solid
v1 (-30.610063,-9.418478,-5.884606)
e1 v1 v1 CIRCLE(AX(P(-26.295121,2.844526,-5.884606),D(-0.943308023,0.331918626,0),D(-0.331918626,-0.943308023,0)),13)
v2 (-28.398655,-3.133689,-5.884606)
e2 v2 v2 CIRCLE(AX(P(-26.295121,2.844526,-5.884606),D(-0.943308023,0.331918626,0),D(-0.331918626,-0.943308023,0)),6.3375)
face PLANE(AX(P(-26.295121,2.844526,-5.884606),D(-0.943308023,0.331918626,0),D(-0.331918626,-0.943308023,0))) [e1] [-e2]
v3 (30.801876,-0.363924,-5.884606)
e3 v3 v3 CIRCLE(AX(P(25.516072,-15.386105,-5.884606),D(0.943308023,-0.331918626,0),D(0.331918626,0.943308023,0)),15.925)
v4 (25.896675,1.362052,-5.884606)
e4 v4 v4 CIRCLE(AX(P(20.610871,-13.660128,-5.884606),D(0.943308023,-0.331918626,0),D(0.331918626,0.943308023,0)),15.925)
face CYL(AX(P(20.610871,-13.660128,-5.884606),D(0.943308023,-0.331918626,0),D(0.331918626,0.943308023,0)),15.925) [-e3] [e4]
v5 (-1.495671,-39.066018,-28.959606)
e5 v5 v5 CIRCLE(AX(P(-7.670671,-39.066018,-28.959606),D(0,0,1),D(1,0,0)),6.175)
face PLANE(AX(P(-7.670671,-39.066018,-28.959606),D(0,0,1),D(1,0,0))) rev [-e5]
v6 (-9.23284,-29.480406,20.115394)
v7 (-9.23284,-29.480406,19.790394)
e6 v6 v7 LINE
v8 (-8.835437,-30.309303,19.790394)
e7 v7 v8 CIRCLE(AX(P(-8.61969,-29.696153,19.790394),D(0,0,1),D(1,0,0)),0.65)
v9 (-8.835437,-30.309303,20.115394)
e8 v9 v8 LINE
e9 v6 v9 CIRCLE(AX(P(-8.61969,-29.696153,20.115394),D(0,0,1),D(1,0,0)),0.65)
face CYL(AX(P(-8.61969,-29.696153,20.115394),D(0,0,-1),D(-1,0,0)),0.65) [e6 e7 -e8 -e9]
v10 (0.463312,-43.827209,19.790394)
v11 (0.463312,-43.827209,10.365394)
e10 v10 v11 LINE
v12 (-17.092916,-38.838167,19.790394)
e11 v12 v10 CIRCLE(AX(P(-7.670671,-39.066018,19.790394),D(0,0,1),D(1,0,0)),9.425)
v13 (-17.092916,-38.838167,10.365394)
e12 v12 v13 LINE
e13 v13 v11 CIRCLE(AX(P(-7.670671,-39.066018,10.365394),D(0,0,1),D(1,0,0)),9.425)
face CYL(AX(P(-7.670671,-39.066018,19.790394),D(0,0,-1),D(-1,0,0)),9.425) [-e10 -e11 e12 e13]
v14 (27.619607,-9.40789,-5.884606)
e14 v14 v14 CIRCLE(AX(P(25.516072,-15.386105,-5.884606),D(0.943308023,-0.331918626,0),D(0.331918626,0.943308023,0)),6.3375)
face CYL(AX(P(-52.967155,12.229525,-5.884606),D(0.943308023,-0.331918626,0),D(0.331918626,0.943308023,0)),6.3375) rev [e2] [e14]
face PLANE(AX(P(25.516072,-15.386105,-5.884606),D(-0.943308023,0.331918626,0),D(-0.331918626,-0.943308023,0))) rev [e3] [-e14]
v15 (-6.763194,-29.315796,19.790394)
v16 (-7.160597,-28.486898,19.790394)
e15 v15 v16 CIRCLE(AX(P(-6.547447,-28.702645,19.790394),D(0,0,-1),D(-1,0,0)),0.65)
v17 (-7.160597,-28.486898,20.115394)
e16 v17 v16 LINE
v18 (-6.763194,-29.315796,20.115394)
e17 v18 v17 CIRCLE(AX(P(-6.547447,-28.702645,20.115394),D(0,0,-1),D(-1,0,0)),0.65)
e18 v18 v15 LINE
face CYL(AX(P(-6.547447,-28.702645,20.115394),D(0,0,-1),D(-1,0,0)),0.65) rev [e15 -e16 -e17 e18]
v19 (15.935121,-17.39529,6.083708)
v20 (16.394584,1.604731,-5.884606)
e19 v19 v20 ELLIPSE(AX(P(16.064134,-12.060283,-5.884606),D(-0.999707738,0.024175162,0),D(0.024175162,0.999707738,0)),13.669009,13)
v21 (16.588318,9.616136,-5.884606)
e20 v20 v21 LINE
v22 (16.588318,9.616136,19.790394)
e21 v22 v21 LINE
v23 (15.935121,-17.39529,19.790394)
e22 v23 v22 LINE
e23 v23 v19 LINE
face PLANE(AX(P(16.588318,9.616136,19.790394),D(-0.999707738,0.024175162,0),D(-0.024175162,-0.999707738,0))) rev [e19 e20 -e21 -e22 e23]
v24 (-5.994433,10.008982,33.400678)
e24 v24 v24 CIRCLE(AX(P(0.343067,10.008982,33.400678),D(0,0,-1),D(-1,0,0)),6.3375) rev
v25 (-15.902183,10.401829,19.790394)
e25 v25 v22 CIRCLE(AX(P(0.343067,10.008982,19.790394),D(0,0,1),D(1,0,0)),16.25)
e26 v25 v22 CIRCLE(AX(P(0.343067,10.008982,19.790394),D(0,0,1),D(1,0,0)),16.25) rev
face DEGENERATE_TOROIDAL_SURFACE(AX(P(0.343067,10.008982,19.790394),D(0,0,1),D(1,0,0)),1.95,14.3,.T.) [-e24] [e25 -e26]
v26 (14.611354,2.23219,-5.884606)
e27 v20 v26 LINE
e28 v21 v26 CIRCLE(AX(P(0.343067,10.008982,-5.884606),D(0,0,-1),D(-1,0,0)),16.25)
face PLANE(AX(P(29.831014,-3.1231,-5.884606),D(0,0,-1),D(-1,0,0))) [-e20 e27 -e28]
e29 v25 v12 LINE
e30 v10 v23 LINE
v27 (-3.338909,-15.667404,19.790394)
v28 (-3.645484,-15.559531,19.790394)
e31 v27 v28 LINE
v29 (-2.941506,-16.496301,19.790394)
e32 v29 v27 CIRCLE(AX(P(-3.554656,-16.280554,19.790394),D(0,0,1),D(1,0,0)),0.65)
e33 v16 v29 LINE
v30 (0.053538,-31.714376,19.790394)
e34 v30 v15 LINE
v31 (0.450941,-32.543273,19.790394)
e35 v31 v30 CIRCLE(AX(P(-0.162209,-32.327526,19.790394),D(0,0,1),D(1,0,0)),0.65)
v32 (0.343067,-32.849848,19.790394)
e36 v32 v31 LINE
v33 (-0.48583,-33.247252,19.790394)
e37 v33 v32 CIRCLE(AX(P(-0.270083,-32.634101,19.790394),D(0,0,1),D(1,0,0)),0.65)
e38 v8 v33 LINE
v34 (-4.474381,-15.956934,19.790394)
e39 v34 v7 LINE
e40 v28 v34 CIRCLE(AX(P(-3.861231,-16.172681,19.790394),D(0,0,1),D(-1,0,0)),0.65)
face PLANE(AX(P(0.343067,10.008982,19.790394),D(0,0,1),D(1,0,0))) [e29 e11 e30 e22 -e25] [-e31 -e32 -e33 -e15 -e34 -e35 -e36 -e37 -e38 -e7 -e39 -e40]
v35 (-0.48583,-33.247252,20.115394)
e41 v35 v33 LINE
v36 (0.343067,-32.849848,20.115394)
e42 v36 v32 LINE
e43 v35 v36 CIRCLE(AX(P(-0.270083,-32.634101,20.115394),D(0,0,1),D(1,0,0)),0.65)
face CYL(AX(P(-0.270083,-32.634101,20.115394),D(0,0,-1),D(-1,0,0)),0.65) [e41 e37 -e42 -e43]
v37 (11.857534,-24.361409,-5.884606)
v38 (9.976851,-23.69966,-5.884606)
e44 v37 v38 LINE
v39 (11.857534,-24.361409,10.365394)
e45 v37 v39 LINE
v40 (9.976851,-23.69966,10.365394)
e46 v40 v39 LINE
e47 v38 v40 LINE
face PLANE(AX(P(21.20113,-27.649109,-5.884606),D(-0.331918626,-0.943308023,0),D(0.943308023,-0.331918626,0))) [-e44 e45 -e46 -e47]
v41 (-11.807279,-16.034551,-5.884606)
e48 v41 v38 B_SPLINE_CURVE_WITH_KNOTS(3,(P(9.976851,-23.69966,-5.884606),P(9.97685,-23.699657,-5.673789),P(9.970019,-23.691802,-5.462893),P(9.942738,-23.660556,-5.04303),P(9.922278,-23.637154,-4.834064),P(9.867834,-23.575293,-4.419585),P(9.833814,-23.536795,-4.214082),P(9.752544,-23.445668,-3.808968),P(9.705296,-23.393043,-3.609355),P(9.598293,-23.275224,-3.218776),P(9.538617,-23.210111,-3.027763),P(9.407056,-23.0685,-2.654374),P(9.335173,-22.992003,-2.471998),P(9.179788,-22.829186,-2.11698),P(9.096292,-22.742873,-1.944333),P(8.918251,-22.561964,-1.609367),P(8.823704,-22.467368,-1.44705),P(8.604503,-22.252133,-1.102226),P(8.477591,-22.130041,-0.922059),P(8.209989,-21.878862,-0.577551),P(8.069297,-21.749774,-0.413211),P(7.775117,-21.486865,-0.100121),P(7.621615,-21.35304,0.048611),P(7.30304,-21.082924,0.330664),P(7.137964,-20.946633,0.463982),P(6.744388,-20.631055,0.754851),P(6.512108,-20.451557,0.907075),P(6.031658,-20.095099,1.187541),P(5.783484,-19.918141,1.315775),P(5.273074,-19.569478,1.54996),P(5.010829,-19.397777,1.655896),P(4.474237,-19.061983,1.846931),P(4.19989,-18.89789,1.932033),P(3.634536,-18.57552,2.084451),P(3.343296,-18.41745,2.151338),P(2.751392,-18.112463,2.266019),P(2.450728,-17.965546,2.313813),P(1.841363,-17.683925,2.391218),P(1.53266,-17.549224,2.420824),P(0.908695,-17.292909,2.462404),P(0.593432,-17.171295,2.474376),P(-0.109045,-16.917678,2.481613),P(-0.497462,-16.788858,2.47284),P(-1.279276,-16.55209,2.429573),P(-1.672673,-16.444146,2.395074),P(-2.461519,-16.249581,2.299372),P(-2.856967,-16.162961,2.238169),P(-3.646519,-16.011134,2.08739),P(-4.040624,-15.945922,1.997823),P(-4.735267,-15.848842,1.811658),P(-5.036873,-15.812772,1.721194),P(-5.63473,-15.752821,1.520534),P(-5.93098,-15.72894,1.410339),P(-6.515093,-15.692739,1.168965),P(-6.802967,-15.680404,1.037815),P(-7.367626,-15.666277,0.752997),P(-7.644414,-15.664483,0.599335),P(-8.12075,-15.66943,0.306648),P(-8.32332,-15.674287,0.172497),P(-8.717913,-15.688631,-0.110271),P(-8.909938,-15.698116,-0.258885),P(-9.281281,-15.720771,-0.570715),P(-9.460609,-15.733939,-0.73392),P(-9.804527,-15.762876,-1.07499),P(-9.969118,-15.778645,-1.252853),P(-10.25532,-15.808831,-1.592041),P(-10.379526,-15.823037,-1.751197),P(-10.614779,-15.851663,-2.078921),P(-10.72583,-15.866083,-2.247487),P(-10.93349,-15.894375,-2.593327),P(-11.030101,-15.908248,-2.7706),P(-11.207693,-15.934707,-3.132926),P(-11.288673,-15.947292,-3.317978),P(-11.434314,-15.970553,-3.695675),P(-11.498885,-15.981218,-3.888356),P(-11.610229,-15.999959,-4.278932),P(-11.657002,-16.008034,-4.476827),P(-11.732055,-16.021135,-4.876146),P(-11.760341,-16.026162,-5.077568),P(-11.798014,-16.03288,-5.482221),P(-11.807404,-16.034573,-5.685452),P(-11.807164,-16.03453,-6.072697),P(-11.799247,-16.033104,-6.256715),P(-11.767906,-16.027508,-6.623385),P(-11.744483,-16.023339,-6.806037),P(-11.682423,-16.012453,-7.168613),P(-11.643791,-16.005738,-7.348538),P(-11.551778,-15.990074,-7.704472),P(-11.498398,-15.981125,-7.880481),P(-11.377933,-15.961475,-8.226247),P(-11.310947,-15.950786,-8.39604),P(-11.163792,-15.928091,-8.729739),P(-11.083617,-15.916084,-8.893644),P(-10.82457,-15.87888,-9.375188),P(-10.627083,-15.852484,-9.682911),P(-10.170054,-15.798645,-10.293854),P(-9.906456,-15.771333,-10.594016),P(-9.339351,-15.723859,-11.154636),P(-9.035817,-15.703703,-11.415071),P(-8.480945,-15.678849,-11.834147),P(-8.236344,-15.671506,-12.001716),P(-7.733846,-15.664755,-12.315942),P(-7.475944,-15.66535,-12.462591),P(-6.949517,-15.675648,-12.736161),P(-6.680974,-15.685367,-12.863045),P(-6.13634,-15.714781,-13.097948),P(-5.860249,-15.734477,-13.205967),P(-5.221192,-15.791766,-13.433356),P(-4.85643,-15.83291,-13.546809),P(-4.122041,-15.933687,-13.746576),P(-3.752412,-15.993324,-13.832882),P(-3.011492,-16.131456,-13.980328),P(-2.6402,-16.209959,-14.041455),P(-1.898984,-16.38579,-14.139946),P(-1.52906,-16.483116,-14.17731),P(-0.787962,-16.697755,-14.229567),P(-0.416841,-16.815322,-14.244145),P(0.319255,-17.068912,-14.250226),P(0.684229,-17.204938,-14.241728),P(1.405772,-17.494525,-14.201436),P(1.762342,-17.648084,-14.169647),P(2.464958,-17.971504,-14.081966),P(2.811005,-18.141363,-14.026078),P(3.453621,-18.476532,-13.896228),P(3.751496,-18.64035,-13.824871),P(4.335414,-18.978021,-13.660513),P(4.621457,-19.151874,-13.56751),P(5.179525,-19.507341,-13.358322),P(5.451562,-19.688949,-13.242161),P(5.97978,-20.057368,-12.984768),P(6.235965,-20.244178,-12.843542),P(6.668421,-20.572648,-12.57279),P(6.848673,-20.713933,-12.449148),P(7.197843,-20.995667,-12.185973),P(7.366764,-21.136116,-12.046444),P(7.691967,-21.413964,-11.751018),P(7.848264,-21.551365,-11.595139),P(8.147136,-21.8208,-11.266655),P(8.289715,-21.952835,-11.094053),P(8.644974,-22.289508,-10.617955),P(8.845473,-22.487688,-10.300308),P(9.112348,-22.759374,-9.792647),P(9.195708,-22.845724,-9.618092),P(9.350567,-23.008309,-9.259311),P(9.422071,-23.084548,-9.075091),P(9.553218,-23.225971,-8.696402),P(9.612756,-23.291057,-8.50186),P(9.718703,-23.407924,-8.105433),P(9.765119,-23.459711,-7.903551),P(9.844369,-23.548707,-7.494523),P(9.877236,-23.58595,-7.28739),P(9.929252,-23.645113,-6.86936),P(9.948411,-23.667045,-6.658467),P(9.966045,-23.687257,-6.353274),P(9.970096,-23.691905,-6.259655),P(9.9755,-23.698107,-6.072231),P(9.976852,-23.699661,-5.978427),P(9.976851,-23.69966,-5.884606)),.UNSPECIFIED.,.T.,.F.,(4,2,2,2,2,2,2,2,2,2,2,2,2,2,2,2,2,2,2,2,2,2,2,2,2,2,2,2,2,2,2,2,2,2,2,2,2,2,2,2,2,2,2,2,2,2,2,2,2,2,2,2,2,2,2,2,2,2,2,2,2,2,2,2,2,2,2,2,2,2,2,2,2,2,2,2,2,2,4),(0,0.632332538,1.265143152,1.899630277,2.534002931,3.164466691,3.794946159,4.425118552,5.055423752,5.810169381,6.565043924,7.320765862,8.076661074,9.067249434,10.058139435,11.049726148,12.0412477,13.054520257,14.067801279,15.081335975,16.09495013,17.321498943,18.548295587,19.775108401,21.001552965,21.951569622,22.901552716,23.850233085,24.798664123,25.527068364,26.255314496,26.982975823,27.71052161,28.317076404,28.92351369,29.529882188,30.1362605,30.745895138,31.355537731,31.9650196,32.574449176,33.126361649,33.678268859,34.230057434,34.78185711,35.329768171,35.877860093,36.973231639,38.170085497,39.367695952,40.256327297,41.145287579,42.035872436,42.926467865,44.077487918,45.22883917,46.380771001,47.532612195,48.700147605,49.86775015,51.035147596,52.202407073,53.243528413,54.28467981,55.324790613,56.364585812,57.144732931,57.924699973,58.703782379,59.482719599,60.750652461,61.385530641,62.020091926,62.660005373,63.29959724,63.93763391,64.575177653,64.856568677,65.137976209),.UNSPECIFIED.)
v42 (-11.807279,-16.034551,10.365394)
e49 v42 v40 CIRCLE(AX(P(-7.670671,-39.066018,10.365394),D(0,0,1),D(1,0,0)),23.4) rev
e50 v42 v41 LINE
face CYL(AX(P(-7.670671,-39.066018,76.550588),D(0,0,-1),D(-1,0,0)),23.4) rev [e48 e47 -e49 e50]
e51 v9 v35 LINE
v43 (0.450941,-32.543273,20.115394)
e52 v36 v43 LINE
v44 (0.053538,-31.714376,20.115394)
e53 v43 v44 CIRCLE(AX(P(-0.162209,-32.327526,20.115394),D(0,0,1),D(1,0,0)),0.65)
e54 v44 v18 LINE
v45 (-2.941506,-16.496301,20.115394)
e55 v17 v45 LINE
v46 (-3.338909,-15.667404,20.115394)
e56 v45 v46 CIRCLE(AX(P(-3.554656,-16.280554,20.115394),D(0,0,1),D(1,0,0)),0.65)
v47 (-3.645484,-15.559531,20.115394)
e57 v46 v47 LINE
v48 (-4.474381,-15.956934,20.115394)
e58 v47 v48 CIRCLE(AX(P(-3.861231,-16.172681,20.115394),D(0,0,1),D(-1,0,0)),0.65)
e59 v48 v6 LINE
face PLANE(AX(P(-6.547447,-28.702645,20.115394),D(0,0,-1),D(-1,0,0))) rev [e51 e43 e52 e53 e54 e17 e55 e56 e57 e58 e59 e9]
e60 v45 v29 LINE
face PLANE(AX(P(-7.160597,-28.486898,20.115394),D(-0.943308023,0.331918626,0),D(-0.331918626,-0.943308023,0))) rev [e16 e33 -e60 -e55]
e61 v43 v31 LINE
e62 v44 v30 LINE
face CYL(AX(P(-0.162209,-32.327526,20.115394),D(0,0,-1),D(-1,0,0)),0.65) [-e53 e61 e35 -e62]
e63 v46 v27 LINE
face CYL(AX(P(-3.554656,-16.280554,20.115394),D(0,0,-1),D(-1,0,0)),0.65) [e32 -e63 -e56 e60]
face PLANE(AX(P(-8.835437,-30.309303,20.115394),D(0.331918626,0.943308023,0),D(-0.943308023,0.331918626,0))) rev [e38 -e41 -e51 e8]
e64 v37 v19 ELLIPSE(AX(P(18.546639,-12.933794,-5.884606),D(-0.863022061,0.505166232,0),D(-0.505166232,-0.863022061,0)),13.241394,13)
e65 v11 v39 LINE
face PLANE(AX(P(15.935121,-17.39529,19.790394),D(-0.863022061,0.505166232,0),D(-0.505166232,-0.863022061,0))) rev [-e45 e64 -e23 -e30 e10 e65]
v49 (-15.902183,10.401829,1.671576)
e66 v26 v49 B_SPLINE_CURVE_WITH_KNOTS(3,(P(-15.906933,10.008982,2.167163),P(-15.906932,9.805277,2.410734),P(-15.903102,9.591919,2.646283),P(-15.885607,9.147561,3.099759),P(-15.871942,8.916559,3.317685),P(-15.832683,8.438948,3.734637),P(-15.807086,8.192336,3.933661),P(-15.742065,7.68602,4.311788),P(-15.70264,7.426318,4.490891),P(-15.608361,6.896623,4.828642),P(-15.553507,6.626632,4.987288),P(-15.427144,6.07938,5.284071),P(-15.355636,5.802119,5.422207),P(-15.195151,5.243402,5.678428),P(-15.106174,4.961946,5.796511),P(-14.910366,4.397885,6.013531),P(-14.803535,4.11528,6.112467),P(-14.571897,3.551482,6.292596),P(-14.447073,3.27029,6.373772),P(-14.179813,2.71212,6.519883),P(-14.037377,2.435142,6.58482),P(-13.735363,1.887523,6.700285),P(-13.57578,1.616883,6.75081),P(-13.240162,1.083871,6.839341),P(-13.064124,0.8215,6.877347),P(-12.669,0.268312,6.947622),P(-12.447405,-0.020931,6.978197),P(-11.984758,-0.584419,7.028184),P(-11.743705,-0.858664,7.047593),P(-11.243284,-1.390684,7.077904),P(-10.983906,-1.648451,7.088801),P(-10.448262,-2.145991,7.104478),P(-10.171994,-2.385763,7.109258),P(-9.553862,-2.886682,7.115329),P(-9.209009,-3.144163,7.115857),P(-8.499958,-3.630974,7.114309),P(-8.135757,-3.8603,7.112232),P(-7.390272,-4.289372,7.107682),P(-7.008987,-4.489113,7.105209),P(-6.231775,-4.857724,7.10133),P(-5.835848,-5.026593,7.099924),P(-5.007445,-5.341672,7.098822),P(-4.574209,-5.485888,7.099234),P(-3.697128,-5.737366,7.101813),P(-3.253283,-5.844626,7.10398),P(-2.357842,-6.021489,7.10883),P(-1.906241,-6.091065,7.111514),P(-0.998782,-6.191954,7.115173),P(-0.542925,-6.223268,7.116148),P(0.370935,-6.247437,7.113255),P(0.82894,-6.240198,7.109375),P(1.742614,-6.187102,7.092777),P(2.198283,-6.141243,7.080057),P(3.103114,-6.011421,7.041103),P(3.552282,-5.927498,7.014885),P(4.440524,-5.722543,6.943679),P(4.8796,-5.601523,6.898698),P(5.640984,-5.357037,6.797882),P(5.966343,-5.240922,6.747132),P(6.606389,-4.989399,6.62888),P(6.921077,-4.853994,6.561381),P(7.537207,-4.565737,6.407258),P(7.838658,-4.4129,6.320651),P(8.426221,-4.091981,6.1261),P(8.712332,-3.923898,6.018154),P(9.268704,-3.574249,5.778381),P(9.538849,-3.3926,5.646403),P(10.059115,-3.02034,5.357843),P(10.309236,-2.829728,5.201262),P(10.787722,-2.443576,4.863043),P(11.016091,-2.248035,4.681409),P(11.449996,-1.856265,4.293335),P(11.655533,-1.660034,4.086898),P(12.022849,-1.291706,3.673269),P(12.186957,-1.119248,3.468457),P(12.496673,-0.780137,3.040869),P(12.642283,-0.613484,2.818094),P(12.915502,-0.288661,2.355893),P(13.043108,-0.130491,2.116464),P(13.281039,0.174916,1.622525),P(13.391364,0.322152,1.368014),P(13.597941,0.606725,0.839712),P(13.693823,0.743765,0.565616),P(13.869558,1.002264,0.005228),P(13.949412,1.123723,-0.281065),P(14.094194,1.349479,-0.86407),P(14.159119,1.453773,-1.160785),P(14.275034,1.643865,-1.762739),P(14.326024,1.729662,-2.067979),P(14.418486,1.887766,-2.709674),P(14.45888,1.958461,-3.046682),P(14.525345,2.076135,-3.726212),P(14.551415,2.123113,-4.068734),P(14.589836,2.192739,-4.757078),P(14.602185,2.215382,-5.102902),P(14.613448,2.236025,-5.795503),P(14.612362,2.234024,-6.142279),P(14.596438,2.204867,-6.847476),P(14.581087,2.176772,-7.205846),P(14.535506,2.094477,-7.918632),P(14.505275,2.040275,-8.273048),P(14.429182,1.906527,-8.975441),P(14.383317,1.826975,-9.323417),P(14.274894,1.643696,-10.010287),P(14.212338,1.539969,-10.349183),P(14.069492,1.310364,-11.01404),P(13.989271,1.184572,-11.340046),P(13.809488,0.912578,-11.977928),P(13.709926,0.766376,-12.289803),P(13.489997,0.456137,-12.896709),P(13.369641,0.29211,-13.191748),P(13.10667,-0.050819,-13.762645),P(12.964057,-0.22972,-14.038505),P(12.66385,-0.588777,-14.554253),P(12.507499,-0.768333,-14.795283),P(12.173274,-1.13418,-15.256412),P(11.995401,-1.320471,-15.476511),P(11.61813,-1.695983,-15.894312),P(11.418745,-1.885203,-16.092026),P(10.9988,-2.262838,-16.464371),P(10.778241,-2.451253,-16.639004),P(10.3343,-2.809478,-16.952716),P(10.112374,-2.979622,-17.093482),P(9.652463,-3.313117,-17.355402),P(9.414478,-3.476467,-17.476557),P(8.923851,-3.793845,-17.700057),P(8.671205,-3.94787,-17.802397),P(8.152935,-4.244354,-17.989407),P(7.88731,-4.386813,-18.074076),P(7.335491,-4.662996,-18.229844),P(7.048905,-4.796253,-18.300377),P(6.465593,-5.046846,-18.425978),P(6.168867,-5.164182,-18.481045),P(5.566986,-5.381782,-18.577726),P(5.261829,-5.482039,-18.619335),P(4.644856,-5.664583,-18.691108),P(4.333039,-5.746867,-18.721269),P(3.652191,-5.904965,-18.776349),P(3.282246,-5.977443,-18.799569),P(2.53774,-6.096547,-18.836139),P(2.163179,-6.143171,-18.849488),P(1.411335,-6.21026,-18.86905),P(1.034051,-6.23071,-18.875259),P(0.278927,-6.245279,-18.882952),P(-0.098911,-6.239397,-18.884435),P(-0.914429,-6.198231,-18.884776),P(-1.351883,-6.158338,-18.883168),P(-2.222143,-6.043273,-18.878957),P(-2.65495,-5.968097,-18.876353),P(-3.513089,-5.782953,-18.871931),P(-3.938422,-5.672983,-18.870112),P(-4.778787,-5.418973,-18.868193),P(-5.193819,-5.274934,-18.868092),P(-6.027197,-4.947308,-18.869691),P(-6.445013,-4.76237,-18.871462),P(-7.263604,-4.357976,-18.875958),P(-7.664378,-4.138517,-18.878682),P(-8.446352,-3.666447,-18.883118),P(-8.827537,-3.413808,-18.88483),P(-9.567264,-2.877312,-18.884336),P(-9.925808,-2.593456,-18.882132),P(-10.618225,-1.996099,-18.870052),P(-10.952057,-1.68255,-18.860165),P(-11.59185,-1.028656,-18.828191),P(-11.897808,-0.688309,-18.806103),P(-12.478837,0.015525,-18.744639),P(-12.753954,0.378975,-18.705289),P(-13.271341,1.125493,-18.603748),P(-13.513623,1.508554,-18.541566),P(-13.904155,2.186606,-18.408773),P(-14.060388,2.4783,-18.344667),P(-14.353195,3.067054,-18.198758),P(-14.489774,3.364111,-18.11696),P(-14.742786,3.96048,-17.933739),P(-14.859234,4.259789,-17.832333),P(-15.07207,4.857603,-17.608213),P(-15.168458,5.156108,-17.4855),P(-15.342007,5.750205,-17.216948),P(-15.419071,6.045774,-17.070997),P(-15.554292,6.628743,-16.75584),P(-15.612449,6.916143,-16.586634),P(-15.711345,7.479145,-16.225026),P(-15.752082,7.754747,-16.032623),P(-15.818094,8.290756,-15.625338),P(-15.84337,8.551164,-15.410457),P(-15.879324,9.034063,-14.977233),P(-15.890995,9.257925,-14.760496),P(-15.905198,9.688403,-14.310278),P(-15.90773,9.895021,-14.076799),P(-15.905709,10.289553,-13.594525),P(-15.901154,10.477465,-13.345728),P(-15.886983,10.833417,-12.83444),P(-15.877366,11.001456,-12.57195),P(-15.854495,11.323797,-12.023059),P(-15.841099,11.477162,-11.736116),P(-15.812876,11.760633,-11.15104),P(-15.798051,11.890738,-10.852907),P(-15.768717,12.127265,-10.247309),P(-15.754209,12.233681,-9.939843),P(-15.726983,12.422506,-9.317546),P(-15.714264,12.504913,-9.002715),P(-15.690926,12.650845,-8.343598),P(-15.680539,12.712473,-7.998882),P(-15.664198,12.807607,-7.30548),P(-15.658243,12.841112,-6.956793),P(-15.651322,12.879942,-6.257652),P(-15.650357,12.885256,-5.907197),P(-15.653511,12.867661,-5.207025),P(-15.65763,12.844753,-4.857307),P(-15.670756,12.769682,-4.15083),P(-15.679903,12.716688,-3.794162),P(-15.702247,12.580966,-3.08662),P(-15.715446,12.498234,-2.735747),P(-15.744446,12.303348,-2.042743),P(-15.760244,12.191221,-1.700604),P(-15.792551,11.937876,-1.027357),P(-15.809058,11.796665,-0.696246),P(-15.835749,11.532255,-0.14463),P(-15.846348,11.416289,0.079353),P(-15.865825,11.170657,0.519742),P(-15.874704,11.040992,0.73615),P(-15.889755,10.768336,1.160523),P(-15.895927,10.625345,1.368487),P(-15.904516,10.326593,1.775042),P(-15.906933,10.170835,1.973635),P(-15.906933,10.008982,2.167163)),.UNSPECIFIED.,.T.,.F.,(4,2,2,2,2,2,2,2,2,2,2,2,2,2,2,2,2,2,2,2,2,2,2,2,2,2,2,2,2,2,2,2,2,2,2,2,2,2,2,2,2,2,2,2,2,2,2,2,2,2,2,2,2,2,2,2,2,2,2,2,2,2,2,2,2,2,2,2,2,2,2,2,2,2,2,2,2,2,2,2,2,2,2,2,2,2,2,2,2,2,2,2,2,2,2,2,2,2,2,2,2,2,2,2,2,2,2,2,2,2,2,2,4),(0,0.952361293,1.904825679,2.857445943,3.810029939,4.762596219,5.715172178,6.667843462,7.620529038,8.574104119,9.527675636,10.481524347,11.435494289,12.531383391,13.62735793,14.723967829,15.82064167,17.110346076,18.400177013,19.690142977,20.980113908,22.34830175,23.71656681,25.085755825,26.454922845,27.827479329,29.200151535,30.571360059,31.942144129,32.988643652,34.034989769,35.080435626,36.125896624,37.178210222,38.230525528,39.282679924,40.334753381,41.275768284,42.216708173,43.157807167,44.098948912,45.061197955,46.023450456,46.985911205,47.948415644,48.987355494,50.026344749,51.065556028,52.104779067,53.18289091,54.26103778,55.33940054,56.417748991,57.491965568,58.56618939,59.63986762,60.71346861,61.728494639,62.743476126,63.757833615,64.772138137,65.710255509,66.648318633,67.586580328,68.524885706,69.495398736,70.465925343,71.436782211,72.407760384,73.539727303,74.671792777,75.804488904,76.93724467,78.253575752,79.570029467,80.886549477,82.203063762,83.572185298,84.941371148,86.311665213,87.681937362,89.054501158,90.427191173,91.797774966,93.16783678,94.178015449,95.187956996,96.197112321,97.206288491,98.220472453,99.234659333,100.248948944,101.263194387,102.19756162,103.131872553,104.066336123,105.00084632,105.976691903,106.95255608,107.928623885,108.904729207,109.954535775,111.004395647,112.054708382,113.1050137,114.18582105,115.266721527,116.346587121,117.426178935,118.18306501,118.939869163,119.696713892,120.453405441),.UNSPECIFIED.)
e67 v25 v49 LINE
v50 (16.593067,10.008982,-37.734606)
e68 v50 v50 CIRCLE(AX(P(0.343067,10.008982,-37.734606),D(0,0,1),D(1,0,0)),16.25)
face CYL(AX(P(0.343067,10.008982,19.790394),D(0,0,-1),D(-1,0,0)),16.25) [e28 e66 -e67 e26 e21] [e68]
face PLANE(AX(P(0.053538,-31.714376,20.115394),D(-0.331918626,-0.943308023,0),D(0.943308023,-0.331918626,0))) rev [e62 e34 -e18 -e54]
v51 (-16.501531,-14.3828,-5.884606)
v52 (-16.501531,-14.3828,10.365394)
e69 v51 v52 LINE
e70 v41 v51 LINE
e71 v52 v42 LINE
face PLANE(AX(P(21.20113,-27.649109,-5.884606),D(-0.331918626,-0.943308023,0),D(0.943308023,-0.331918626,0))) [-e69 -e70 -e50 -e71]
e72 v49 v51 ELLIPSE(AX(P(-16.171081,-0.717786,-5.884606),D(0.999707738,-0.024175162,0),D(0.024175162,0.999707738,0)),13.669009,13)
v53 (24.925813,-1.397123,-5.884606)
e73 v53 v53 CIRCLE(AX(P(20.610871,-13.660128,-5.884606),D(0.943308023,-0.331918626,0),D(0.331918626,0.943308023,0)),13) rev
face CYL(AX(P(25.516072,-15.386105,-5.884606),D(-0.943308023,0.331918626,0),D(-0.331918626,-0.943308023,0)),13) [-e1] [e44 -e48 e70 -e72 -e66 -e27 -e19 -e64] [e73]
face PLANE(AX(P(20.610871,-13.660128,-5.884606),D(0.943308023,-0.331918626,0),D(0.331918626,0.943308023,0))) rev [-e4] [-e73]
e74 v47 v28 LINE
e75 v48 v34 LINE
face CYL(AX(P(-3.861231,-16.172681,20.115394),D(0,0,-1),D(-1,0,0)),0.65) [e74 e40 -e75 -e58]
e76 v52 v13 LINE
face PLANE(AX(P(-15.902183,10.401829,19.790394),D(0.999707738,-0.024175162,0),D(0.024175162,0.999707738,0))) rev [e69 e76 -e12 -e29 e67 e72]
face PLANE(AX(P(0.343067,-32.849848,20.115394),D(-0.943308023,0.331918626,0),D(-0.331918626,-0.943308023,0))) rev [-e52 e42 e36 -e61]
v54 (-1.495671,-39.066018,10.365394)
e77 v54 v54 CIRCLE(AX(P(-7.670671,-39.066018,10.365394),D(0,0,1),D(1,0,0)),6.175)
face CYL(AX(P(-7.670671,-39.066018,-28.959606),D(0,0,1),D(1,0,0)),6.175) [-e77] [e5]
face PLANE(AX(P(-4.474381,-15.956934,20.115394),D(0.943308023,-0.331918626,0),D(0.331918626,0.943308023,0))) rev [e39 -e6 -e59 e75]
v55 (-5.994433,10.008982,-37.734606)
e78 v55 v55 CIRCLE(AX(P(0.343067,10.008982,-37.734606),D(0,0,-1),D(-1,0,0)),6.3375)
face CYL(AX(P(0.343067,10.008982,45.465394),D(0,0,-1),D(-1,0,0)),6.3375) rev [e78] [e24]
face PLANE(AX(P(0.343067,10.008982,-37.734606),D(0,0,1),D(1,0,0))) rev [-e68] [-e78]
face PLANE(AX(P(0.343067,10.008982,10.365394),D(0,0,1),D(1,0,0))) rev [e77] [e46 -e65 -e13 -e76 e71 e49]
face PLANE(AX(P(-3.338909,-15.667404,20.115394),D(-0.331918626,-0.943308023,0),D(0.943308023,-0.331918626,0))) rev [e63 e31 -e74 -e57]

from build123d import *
from build123d.topology import SkipClean

# Parameters (mm, degrees)
BOSS_EXTRU_1_DEPTH       = 1.45
ESQUISSE2_R              = 2.5
BOSS_EXTRU_2_DEPTH       = 2.2
BOSS_EXTRU_3_START       = 7.4
ESQUISSE4_R              = 2.5
BOSS_EXTRU_3_DEPTH       = 11.05
BOSS_EXTRU_4_START       = -1.45
ESQUISSE5_R              = 0.95
BOSS_EXTRU_4_DEPTH       = 7.5
CONG_2_R                 = 2.2
BOSS_EXTRU_5_DEPTH       = 1
BOSS_EXTRU_5_DEPTH_BACK  = 7.45
ENL_V_START              = -5.4
ENL_V_MAT_EXTRU_7_DEPTH  = 5.4
BOSS_EXTRU_14_DEPTH      = 1
BOSS_EXTRU_14_DEPTH_BACK = 7.45
ESQUISSE14_R             = 2
ESQUISSE15_R             = 2.45
BOSS_EXTRU_15_DEPTH      = 0.8
ENL_V_START_2            = -6.05
ESQUISSE16_R             = 3.6
ESQUISSE16_R_2           = 0.95
ENL_V_MAT_EXTRU_9_DEPTH  = 6.05
ESQUISSE17_R             = 0.975
ENL_V_MAT_EXTRU_10_DEPTH = 12.8
ESQUISSE18_R             = 0.975
ENL_V_MAT_EXTRU_11_DEPTH = 12.8
BOSS_EXTRU_16_DEPTH      = 0.05
SCALE1_SCALE             = 6.5


with BuildPart() as part:
    # Esquisse1 → Boss.-Extru.1 (new body)
    with BuildSketch(Plane.XY):
        with BuildLine():
            Line((-2.499269345, 0.060437906), (-2.682459021, -7.514946015))
            ThreePointArc((-2.682459021, -7.514946015), (-1.629243216, -8.944775402), (0.018499188, -8.282491037))
            Line((0.018499188, -8.282491037), (2.398777572, -4.216041966))
            Line((2.398777572, -4.216041966), (2.499269345, -0.060437906))
            ThreePointArc((2.499269345, -0.060437906), (0.060437906, 2.499269345), (-2.499269345, 0.060437906))
        make_face()
    extrude(amount=BOSS_EXTRU_1_DEPTH)

    # Esquisse2 → Boss.-Extru.2 (add)
    with BuildSketch(Plane.XY.offset(1.45)):
        with Locations(Location((0, 0, 0), (0, 0, 178.614730271))):
            Circle(ESQUISSE2_R)
    extrude(amount=BOSS_EXTRU_2_DEPTH)

    # Esquisse4 → Boss.-Extru.3 (add)
    with SkipClean():  # the faces are left unmerged after this step: merging them gives an invalid solid
        with BuildSketch(Plane(origin=(0, 0, 0), x_dir=(-1, 0, 0), z_dir=(0, 0, -1)).offset(BOSS_EXTRU_3_START)):
            with Locations(Location((0, 0, 0), (0, 0, 180))):
                Circle(ESQUISSE4_R)
        extrude(amount=-BOSS_EXTRU_3_DEPTH)
    add(part.part.scale(1), mode=Mode.REPLACE)  # the faces are merged on a copy

    # Esquisse5 → Boss.-Extru.4 (add)
    with SkipClean():  # the faces are left unmerged after this step: merging them gives an invalid solid
        with BuildSketch(Plane(origin=(0, 0, 0), x_dir=(-1, 0, 0), z_dir=(0, 0, -1)).offset(BOSS_EXTRU_4_START)):
            with Locations(Location((1.232882801, -7.55, 0), (0, 0, 180))):
                Circle(ESQUISSE5_R)
        extrude(amount=BOSS_EXTRU_4_DEPTH)

    # Congé2
    cong_2_edges = [part.edges().sort_by_distance(p)[0] for p in [
        (0.030221161, 2.49981733, 3.65),
    ]]
    fillet(cong_2_edges, radius=CONG_2_R - 0.0001)  # a hair under: the kernel refuses the full size

    # Esquisse6 → Boss.-Extru.5 (add, two sides: drawn at the far end of the back side and taken through both)
    with BuildSketch(Plane(origin=(-2.358270057, 0.829796565, 0), x_dir=(0, 0, 1), z_dir=(-0.9433080226536918, 0.3319186261678939, 0)).offset(-BOSS_EXTRU_5_DEPTH_BACK)):
        with BuildLine():
            Line((-2.5, -4.4), (0, -4.4))
            Line((0, -4.4), (0, 1.297884729))
            Line((0, 1.297884729), (-2.5, 1.297884729))
            Line((-2.5, 1.297884729), (-2.5, -0.4))
            ThreePointArc((-2.5, -0.4), (-4.5, -2.4), (-2.5, -4.4))
        make_face()
    extrude(amount=BOSS_EXTRU_5_DEPTH + BOSS_EXTRU_5_DEPTH_BACK)

    # Esquisse13 → Enlèv. mat.-Extru.7 (cut)
    with SkipClean():  # the faces are left unmerged after this step: merging them gives an invalid solid
        with BuildSketch(Plane.XY.offset(ENL_V_START)):
            with BuildLine():
                Line((-1.584775977, 1.933516253), (-2.870785963, 2.386020269))
                Line((-2.870785963, 2.386020269), (-4.762020034, -2.988840108))
                Line((-4.762020034, -2.988840108), (-2.591476667, -3.752581914))
                Line((-2.591476667, -3.752581914), (-2.499269345, 0.060437906))
                ThreePointArc((-2.499269345, 0.060437906), (-2.246544496, 1.096830811), (-1.584775977, 1.933516253))
            make_face()
            with BuildLine():
                Line((1.771456427, -5.28775253), (3.208932757, -5.793552499))
                Line((3.208932757, -5.793552499), (5.100166828, -0.418692123))
                Line((5.100166828, -0.418692123), (2.446360209, 0.515093901))
                ThreePointArc((2.446360209, 0.515093901), (2.489502388, 0.228862104), (2.499269345, -0.060437906))
                Line((2.499269345, -0.060437906), (2.398777572, -4.216041966))
                Line((2.398777572, -4.216041966), (1.771456427, -5.28775253))
            make_face()
        extrude(amount=ENL_V_MAT_EXTRU_7_DEPTH, mode=Mode.SUBTRACT)

    # Esquisse14 → Boss.-Extru.14 (add, two sides: drawn at the far end of the back side and taken through both)
    with BuildSketch(Plane(origin=(-2.358270057, 0.829796565, 0), x_dir=(0, 0, 1), z_dir=(-0.9433080226536918, 0.3319186261678939, 0)).offset(-BOSS_EXTRU_14_DEPTH_BACK)):
        with Locations(Location((-2.5, -2.4, 0), (0, 0, 270))):
            Circle(ESQUISSE14_R)
    extrude(amount=BOSS_EXTRU_14_DEPTH + BOSS_EXTRU_14_DEPTH_BACK)

    # Esquisse15 → Boss.-Extru.15 (add)
    with BuildSketch(Plane(origin=(4.669374712, -1.6429972, 0), x_dir=(0, 0, -1), z_dir=(0.9433080226536918, -0.33191862616789397, 0))):
        with Locations(Location((2.5, -2.4, 0), (0, 0, 90))):
            Circle(ESQUISSE15_R)
    extrude(amount=-BOSS_EXTRU_15_DEPTH)

    # Esquisse16 → Enlèv. mat.-Extru.9 (cut)
    with BuildSketch(Plane(origin=(0, 0, -6.05), x_dir=(-1, 0, 0), z_dir=(0, 0, -1)).offset(ENL_V_START_2)):
        with Locations((1.232882801, -7.55)):
            Circle(ESQUISSE16_R)
        with Locations(Location((1.232882801, -7.55, 0), (0, 0, 180))):
            Circle(ESQUISSE16_R_2, mode=Mode.SUBTRACT)
    extrude(amount=ENL_V_MAT_EXTRU_9_DEPTH, mode=Mode.SUBTRACT)

    # Esquisse17 → Enlèv. mat.-Extru.10 (cut)
    with BuildSketch(Plane(origin=(0, 0, -7.4), x_dir=(-1, 0, 0), z_dir=(0, 0, -1))):
        Circle(ESQUISSE17_R)
    extrude(amount=-ENL_V_MAT_EXTRU_10_DEPTH, mode=Mode.SUBTRACT)

    # Esquisse18 → Enlèv. mat.-Extru.11 (cut)
    with BuildSketch(Plane(origin=(4.669374712, -1.6429972, 0), x_dir=(0, 0, -1), z_dir=(0.9433080226536918, -0.33191862616789397, 0))):
        with Locations(Location((2.5, -2.4, 0), (0, 0, 90))):
            Circle(ESQUISSE18_R)
    extrude(amount=-ENL_V_MAT_EXTRU_11_DEPTH, mode=Mode.SUBTRACT)

    # Esquisse19 → Boss.-Extru.16 (add)
    with BuildSketch(Plane.XY.offset(1.45)):
        with BuildLine():
            Line((-0.741145926, -3.994756307), (-1.473216513, -6.075290521))
            ThreePointArc((-1.473216513, -6.075290521), (-1.469057852, -6.151714142), (-1.412077574, -6.202813186))
            Line((-1.412077574, -6.202813186), (-0.127522665, -6.654805208))
            ThreePointArc((-0.127522665, -6.654805208), (-0.051099043, -6.650646547), (0, -6.593666268))
            Line((0, -6.593666268), (0.016595931, -6.546500867))
            ThreePointArc((0.016595931, -6.546500867), (0.01243727, -6.470077246), (-0.044543008, -6.418978202))
            Line((-0.044543008, -6.418978202), (-1.093270911, -6.049965837))
            ThreePointArc((-1.093270911, -6.049965837), (-1.15025119, -5.998866793), (-1.154409851, -5.922443172))
            Line((-1.154409851, -5.922443172), (-0.50531892, -4.077735963))
            ThreePointArc((-0.50531892, -4.077735963), (-0.509477582, -4.001312342), (-0.56645786, -3.950213298))
            Line((-0.56645786, -3.950213298), (-0.613623261, -3.933617367))
            ThreePointArc((-0.613623261, -3.933617367), (-0.690046883, -3.937776028), (-0.741145926, -3.994756307))
        make_face()
    extrude(amount=BOSS_EXTRU_16_DEPTH)


with BuildPart() as part_1:
    # Scale1: scaled about (-0.062378665, -1.819814111, -1.884608328)
    add(part.part.scale(SCALE1_SCALE).moved(Location((0.343082657, 10.00897761, 10.365345804))))


solid = part_1.part
